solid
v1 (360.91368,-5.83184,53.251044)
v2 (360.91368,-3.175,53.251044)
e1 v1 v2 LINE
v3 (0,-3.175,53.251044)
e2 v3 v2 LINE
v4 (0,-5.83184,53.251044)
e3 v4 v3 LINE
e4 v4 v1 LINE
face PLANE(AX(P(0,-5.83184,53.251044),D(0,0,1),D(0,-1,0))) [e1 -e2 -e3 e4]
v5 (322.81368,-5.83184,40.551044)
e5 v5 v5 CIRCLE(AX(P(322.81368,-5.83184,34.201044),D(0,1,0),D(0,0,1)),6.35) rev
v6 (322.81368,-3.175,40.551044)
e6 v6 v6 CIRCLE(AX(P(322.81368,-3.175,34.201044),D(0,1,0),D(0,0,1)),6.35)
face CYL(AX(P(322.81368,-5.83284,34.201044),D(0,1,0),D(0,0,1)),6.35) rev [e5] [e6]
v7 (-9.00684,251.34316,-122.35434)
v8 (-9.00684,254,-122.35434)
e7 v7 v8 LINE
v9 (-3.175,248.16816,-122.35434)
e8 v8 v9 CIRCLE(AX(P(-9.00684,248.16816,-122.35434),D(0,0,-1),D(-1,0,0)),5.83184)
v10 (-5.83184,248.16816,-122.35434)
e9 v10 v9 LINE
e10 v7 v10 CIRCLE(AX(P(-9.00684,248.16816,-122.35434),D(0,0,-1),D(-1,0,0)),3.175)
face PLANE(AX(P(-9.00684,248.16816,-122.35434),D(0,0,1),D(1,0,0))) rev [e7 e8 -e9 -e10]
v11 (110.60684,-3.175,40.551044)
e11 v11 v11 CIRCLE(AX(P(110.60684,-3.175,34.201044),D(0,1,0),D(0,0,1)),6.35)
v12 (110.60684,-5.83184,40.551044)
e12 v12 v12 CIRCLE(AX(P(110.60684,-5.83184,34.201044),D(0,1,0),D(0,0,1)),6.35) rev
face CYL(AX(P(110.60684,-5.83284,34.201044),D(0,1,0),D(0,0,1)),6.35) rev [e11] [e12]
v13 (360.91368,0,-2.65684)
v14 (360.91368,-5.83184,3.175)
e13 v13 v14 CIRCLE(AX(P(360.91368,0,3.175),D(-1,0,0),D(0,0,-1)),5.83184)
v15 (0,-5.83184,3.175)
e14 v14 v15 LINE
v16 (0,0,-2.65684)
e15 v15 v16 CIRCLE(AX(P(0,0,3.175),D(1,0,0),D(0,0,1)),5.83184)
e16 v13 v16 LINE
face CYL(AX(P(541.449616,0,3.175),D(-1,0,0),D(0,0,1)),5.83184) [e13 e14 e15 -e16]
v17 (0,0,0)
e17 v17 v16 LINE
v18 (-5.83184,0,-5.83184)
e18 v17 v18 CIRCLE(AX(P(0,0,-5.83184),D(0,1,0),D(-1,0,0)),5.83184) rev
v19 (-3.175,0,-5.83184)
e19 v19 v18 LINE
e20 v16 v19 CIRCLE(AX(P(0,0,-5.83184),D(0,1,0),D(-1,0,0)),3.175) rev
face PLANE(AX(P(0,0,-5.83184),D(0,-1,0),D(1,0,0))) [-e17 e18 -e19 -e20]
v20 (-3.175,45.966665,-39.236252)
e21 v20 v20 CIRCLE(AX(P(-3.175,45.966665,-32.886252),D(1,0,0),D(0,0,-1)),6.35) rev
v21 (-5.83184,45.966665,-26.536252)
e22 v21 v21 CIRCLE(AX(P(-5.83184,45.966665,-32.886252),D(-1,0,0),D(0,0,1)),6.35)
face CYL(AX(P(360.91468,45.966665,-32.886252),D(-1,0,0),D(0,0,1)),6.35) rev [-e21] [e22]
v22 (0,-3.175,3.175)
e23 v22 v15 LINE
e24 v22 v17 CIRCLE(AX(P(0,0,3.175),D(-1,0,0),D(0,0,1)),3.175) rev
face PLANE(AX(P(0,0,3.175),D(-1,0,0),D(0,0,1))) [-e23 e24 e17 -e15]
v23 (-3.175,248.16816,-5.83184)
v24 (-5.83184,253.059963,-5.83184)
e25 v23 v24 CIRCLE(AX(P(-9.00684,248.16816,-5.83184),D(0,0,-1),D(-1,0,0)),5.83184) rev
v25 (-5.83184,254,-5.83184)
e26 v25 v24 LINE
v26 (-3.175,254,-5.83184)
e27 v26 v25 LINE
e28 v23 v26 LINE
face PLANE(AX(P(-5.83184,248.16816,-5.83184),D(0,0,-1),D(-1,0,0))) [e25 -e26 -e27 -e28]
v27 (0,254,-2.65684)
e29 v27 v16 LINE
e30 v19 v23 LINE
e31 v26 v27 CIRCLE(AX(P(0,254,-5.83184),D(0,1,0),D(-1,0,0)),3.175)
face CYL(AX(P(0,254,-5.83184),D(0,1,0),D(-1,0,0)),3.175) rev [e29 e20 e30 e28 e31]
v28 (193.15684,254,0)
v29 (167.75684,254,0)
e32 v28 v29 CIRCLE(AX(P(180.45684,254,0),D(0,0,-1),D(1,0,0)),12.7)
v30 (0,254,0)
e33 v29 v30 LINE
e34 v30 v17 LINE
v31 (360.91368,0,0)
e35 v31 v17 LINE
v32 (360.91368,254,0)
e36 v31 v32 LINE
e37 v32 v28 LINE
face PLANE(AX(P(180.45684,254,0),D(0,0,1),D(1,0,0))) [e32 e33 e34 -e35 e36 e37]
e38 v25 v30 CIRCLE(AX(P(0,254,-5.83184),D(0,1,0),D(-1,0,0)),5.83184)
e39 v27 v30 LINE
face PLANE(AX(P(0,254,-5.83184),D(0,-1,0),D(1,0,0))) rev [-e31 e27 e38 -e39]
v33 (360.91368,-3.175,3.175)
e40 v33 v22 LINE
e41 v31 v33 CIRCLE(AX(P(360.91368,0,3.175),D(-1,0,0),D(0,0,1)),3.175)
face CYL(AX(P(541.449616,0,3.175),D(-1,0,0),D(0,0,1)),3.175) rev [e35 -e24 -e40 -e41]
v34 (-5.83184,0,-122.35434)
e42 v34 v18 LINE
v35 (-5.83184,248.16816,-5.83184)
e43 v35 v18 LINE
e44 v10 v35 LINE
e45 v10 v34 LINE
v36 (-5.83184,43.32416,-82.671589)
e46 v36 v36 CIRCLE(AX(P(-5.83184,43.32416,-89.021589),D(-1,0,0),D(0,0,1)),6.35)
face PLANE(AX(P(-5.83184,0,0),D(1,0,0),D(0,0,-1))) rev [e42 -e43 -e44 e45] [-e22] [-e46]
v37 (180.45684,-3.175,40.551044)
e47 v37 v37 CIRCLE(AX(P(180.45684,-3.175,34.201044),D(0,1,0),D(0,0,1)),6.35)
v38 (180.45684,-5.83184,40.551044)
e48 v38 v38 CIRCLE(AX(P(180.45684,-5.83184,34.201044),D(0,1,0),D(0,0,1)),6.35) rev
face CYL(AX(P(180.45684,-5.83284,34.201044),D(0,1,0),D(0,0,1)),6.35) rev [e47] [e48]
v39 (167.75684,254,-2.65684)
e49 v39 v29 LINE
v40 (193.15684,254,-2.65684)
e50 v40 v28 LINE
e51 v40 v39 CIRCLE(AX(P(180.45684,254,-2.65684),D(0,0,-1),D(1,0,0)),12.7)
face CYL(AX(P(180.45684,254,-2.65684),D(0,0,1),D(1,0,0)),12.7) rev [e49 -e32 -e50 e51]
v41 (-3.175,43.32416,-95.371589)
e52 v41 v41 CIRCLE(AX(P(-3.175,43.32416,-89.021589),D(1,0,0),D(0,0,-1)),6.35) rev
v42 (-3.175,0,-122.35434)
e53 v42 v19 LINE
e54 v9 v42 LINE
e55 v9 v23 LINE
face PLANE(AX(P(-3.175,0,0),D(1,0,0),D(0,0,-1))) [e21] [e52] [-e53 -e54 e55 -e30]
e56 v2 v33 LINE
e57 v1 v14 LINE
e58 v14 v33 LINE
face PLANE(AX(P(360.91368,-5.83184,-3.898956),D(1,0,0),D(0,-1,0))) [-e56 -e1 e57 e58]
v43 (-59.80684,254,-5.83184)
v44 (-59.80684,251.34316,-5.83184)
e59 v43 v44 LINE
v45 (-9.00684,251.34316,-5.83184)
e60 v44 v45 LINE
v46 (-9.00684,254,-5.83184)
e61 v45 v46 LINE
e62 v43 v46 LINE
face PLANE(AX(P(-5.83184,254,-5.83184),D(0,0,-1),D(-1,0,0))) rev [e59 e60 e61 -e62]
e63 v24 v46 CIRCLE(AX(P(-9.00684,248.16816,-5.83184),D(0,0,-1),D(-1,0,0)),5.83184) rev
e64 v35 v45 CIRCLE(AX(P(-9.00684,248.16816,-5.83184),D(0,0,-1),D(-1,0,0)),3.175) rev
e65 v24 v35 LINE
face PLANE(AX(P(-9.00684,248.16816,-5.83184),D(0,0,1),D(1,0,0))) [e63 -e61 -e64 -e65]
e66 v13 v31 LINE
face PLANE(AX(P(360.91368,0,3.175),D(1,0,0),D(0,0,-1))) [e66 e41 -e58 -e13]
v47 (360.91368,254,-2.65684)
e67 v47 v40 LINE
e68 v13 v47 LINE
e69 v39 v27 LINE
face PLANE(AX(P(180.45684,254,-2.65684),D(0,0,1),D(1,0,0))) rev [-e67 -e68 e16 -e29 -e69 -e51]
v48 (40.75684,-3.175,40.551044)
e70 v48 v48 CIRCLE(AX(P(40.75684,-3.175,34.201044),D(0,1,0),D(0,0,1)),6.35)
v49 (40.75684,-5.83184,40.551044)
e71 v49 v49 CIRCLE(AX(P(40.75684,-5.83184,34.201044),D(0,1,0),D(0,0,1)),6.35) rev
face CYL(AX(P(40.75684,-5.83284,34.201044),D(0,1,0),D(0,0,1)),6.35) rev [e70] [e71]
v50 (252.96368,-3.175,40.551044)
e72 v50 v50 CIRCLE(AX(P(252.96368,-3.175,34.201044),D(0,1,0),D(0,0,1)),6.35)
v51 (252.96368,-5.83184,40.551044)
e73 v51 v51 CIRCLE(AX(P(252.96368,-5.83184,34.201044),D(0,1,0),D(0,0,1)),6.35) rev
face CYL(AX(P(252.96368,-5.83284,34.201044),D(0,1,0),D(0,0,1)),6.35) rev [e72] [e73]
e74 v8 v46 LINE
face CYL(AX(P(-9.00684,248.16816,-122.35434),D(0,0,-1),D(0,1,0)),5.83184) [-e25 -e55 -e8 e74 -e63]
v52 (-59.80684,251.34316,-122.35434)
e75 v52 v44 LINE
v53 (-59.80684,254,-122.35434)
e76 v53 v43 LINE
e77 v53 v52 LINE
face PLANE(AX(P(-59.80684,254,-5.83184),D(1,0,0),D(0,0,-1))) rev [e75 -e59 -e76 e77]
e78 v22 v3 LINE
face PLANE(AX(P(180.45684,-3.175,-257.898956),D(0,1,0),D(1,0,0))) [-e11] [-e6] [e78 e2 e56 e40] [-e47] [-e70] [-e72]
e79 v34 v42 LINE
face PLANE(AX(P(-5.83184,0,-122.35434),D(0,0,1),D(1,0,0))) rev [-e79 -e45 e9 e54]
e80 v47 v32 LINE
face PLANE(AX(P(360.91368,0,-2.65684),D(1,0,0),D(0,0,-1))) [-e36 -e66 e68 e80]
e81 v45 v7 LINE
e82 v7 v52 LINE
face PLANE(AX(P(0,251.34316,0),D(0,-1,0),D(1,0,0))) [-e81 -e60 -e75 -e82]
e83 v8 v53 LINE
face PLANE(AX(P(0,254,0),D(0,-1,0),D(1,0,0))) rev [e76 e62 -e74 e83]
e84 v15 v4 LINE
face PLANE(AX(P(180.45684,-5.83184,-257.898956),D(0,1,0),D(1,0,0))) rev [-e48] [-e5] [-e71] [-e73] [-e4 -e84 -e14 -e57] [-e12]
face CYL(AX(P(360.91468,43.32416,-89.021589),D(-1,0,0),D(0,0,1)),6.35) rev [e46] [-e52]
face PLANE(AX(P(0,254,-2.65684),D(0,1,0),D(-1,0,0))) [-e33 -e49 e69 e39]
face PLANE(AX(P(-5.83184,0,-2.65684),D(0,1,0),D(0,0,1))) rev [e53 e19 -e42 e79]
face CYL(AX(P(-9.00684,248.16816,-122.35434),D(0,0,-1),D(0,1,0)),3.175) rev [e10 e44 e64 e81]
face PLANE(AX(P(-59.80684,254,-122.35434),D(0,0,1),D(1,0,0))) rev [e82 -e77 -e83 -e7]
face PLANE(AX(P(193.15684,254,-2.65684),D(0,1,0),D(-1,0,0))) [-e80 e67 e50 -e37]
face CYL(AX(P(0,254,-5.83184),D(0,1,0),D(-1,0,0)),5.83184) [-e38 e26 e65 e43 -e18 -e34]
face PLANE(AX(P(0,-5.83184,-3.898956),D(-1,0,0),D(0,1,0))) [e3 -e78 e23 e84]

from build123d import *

# Parameters (mm, degrees)
BASE_FLANGE1_DEPTH           = 2.65684
SKETCHED_BEND3_DEPTH         = 360.91368
SKETCHED_BEND3_2_DEPTH       = 360.91368
SKETCH10_R                   = 6.35
CUT_EXTRUDE2_DEPTH           = 2.65684
EDGE_FLANGE5_DEPTH           = 254
EDGE_FLANGE6_STRIP_W         = 16.97736
EDGE_FLANGE6_STRIP_H         = 2.65684
EDGE_FLANGE6_STRIP_CUT_DEPTH = 116.5225
EDGE_FLANGE6_DEPTH           = 116.5225
SKETCH36_R                   = 6.35
CUT_EXTRUDE3_DEPTH           = 2.65684


# Read off the part's stored shape, not the designer's step: Sketched Bend3
# Sheet-metal steps are written as plain solids
with BuildPart() as part:
    # Sketch1 → Base-Flange1 (new body)
    with BuildSketch(Plane.XY):
        with BuildLine():
            Line((0, 0), (0, 254))
            Line((0, 254), (167.75684, 254))
            ThreePointArc((167.75684, 254), (180.45684, 241.3), (193.15684, 254))
            Line((193.15684, 254), (360.91368, 254))
            Line((360.91368, 254), (360.91368, 0))
            Line((360.91368, 0), (360.91368, -57.15))
            Line((360.91368, -57.15), (0, -57.15))
            Line((0, -57.15), (0, 0))
        make_face()
    extrude(amount=-BASE_FLANGE1_DEPTH)

    # Sketched Bend3 outline → Sketched Bend3 (cut)
    with BuildSketch(Plane.YZ):
        with BuildLine():
            ThreePointArc((0, -2.65684), (-2.783367186, -1.949765838), (-4.891802611, 0))
            Line((-4.891802611, 0), (-57.15, 0))
            Line((-57.15, 0), (-57.15, -2.65684))
            Line((-57.15, -2.65684), (0, -2.65684))
        make_face()
    extrude(amount=SKETCHED_BEND3_DEPTH, mode=Mode.SUBTRACT)

    # Sketched Bend3 2 outline → Sketched Bend3 2 (add)
    with BuildSketch(Plane.YZ):
        with BuildLine():
            ThreePointArc((0, 0), (-2.24506403, 0.92993597), (-3.175, 3.175))
            Line((-3.175, 3.175), (-3.175, 53.251044406))
            Line((-3.175, 53.251044406), (-5.83184, 53.251044406))
            Line((-5.83184, 53.251044406), (-5.83184, 3.175))
            ThreePointArc((-5.83184, 3.175), (-5.591894488, 1.519381136), (-4.891802611, 0))
            Line((-4.891802611, 0), (0, 0))
        make_face()
    extrude(amount=SKETCHED_BEND3_2_DEPTH)

    # Sketch10 → Cut-Extrude2 (cut)
    with BuildSketch(Plane(origin=(0, -3.175, 0), x_dir=(1, 0, 0), z_dir=(0, 1, 0))):
        with Locations(Location((322.81368, -34.201044406, 0), (0, 0, 270))):
            Circle(SKETCH10_R)
        with Locations(Location((252.96368, -34.201044406, 0), (0, 0, 270))):
            Circle(SKETCH10_R)
        with Locations(Location((40.75684, -34.201044406, 0), (0, 0, 270))):
            Circle(SKETCH10_R)
        with Locations(Location((110.60684, -34.201044406, 0), (0, 0, 270))):
            Circle(SKETCH10_R)
        with Locations(Location((180.45684, -34.201044406, 0), (0, 0, 270))):
            Circle(SKETCH10_R)
    extrude(amount=-CUT_EXTRUDE2_DEPTH, mode=Mode.SUBTRACT)

    # Edge-Flange5 section (across the edge) → Edge-Flange5 (add)
    with BuildSketch(Plane(origin=(-3.175, 0, -2.65684), x_dir=(1, 0, 0), z_dir=(0, 1, 0))):
        with BuildLine():
            Line((-2.65684, 3.175), (-2.65684, 119.6975))
            Line((-2.65684, 119.6975), (0, 119.6975))
            Line((0, 119.6975), (0, 3.175))
            ThreePointArc((0, 3.175), (0.92993597, 0.92993597), (3.175, 0))
            Line((3.175, 0), (3.175, -2.65684))
            ThreePointArc((3.175, -2.65684), (-0.948733611, -0.948733611), (-2.65684, 3.175))
        make_face()
    extrude(amount=EDGE_FLANGE5_DEPTH)

    # Edge-Flange6 strip (across the edge) → Edge-Flange6 strip cut (cut)
    with BuildSketch(Plane(origin=(-5.83184, 254, -5.83184), x_dir=(0, -1, 0), z_dir=(0, 0, -1))):
        with Locations((-2.65684, -1.32842)):
            Rectangle(EDGE_FLANGE6_STRIP_W, EDGE_FLANGE6_STRIP_H)
    extrude(amount=EDGE_FLANGE6_STRIP_CUT_DEPTH, mode=Mode.SUBTRACT)

    # Edge-Flange6 section (across the edge) → Edge-Flange6 (add)
    with BuildSketch(Plane(origin=(-5.83184, 254, -5.83184), x_dir=(0, -1, 0), z_dir=(0, 0, -1))):
        with BuildLine():
            Line((0, 3.175), (0, 53.975))
            Line((0, 53.975), (2.65684, 53.975))
            Line((2.65684, 53.975), (2.65684, 3.175))
            ThreePointArc((2.65684, 3.175), (3.58677597, 0.92993597), (5.83184, 0))
            Line((5.83184, 0), (5.83184, -2.65684))
            ThreePointArc((5.83184, -2.65684), (1.708106389, -0.948733611), (0, 3.175))
        make_face()
    extrude(amount=EDGE_FLANGE6_DEPTH)

    # Sketch36 → Cut-Extrude3 (cut)
    with BuildSketch(Plane.ZY.offset(5.83184)):
        with Locations((-32.886251514, 45.966665125)):
            Circle(SKETCH36_R)
        with Locations((-89.021589499, 43.324159587)):
            Circle(SKETCH36_R)
    extrude(amount=-CUT_EXTRUDE3_DEPTH, mode=Mode.SUBTRACT)


solid = part.part
